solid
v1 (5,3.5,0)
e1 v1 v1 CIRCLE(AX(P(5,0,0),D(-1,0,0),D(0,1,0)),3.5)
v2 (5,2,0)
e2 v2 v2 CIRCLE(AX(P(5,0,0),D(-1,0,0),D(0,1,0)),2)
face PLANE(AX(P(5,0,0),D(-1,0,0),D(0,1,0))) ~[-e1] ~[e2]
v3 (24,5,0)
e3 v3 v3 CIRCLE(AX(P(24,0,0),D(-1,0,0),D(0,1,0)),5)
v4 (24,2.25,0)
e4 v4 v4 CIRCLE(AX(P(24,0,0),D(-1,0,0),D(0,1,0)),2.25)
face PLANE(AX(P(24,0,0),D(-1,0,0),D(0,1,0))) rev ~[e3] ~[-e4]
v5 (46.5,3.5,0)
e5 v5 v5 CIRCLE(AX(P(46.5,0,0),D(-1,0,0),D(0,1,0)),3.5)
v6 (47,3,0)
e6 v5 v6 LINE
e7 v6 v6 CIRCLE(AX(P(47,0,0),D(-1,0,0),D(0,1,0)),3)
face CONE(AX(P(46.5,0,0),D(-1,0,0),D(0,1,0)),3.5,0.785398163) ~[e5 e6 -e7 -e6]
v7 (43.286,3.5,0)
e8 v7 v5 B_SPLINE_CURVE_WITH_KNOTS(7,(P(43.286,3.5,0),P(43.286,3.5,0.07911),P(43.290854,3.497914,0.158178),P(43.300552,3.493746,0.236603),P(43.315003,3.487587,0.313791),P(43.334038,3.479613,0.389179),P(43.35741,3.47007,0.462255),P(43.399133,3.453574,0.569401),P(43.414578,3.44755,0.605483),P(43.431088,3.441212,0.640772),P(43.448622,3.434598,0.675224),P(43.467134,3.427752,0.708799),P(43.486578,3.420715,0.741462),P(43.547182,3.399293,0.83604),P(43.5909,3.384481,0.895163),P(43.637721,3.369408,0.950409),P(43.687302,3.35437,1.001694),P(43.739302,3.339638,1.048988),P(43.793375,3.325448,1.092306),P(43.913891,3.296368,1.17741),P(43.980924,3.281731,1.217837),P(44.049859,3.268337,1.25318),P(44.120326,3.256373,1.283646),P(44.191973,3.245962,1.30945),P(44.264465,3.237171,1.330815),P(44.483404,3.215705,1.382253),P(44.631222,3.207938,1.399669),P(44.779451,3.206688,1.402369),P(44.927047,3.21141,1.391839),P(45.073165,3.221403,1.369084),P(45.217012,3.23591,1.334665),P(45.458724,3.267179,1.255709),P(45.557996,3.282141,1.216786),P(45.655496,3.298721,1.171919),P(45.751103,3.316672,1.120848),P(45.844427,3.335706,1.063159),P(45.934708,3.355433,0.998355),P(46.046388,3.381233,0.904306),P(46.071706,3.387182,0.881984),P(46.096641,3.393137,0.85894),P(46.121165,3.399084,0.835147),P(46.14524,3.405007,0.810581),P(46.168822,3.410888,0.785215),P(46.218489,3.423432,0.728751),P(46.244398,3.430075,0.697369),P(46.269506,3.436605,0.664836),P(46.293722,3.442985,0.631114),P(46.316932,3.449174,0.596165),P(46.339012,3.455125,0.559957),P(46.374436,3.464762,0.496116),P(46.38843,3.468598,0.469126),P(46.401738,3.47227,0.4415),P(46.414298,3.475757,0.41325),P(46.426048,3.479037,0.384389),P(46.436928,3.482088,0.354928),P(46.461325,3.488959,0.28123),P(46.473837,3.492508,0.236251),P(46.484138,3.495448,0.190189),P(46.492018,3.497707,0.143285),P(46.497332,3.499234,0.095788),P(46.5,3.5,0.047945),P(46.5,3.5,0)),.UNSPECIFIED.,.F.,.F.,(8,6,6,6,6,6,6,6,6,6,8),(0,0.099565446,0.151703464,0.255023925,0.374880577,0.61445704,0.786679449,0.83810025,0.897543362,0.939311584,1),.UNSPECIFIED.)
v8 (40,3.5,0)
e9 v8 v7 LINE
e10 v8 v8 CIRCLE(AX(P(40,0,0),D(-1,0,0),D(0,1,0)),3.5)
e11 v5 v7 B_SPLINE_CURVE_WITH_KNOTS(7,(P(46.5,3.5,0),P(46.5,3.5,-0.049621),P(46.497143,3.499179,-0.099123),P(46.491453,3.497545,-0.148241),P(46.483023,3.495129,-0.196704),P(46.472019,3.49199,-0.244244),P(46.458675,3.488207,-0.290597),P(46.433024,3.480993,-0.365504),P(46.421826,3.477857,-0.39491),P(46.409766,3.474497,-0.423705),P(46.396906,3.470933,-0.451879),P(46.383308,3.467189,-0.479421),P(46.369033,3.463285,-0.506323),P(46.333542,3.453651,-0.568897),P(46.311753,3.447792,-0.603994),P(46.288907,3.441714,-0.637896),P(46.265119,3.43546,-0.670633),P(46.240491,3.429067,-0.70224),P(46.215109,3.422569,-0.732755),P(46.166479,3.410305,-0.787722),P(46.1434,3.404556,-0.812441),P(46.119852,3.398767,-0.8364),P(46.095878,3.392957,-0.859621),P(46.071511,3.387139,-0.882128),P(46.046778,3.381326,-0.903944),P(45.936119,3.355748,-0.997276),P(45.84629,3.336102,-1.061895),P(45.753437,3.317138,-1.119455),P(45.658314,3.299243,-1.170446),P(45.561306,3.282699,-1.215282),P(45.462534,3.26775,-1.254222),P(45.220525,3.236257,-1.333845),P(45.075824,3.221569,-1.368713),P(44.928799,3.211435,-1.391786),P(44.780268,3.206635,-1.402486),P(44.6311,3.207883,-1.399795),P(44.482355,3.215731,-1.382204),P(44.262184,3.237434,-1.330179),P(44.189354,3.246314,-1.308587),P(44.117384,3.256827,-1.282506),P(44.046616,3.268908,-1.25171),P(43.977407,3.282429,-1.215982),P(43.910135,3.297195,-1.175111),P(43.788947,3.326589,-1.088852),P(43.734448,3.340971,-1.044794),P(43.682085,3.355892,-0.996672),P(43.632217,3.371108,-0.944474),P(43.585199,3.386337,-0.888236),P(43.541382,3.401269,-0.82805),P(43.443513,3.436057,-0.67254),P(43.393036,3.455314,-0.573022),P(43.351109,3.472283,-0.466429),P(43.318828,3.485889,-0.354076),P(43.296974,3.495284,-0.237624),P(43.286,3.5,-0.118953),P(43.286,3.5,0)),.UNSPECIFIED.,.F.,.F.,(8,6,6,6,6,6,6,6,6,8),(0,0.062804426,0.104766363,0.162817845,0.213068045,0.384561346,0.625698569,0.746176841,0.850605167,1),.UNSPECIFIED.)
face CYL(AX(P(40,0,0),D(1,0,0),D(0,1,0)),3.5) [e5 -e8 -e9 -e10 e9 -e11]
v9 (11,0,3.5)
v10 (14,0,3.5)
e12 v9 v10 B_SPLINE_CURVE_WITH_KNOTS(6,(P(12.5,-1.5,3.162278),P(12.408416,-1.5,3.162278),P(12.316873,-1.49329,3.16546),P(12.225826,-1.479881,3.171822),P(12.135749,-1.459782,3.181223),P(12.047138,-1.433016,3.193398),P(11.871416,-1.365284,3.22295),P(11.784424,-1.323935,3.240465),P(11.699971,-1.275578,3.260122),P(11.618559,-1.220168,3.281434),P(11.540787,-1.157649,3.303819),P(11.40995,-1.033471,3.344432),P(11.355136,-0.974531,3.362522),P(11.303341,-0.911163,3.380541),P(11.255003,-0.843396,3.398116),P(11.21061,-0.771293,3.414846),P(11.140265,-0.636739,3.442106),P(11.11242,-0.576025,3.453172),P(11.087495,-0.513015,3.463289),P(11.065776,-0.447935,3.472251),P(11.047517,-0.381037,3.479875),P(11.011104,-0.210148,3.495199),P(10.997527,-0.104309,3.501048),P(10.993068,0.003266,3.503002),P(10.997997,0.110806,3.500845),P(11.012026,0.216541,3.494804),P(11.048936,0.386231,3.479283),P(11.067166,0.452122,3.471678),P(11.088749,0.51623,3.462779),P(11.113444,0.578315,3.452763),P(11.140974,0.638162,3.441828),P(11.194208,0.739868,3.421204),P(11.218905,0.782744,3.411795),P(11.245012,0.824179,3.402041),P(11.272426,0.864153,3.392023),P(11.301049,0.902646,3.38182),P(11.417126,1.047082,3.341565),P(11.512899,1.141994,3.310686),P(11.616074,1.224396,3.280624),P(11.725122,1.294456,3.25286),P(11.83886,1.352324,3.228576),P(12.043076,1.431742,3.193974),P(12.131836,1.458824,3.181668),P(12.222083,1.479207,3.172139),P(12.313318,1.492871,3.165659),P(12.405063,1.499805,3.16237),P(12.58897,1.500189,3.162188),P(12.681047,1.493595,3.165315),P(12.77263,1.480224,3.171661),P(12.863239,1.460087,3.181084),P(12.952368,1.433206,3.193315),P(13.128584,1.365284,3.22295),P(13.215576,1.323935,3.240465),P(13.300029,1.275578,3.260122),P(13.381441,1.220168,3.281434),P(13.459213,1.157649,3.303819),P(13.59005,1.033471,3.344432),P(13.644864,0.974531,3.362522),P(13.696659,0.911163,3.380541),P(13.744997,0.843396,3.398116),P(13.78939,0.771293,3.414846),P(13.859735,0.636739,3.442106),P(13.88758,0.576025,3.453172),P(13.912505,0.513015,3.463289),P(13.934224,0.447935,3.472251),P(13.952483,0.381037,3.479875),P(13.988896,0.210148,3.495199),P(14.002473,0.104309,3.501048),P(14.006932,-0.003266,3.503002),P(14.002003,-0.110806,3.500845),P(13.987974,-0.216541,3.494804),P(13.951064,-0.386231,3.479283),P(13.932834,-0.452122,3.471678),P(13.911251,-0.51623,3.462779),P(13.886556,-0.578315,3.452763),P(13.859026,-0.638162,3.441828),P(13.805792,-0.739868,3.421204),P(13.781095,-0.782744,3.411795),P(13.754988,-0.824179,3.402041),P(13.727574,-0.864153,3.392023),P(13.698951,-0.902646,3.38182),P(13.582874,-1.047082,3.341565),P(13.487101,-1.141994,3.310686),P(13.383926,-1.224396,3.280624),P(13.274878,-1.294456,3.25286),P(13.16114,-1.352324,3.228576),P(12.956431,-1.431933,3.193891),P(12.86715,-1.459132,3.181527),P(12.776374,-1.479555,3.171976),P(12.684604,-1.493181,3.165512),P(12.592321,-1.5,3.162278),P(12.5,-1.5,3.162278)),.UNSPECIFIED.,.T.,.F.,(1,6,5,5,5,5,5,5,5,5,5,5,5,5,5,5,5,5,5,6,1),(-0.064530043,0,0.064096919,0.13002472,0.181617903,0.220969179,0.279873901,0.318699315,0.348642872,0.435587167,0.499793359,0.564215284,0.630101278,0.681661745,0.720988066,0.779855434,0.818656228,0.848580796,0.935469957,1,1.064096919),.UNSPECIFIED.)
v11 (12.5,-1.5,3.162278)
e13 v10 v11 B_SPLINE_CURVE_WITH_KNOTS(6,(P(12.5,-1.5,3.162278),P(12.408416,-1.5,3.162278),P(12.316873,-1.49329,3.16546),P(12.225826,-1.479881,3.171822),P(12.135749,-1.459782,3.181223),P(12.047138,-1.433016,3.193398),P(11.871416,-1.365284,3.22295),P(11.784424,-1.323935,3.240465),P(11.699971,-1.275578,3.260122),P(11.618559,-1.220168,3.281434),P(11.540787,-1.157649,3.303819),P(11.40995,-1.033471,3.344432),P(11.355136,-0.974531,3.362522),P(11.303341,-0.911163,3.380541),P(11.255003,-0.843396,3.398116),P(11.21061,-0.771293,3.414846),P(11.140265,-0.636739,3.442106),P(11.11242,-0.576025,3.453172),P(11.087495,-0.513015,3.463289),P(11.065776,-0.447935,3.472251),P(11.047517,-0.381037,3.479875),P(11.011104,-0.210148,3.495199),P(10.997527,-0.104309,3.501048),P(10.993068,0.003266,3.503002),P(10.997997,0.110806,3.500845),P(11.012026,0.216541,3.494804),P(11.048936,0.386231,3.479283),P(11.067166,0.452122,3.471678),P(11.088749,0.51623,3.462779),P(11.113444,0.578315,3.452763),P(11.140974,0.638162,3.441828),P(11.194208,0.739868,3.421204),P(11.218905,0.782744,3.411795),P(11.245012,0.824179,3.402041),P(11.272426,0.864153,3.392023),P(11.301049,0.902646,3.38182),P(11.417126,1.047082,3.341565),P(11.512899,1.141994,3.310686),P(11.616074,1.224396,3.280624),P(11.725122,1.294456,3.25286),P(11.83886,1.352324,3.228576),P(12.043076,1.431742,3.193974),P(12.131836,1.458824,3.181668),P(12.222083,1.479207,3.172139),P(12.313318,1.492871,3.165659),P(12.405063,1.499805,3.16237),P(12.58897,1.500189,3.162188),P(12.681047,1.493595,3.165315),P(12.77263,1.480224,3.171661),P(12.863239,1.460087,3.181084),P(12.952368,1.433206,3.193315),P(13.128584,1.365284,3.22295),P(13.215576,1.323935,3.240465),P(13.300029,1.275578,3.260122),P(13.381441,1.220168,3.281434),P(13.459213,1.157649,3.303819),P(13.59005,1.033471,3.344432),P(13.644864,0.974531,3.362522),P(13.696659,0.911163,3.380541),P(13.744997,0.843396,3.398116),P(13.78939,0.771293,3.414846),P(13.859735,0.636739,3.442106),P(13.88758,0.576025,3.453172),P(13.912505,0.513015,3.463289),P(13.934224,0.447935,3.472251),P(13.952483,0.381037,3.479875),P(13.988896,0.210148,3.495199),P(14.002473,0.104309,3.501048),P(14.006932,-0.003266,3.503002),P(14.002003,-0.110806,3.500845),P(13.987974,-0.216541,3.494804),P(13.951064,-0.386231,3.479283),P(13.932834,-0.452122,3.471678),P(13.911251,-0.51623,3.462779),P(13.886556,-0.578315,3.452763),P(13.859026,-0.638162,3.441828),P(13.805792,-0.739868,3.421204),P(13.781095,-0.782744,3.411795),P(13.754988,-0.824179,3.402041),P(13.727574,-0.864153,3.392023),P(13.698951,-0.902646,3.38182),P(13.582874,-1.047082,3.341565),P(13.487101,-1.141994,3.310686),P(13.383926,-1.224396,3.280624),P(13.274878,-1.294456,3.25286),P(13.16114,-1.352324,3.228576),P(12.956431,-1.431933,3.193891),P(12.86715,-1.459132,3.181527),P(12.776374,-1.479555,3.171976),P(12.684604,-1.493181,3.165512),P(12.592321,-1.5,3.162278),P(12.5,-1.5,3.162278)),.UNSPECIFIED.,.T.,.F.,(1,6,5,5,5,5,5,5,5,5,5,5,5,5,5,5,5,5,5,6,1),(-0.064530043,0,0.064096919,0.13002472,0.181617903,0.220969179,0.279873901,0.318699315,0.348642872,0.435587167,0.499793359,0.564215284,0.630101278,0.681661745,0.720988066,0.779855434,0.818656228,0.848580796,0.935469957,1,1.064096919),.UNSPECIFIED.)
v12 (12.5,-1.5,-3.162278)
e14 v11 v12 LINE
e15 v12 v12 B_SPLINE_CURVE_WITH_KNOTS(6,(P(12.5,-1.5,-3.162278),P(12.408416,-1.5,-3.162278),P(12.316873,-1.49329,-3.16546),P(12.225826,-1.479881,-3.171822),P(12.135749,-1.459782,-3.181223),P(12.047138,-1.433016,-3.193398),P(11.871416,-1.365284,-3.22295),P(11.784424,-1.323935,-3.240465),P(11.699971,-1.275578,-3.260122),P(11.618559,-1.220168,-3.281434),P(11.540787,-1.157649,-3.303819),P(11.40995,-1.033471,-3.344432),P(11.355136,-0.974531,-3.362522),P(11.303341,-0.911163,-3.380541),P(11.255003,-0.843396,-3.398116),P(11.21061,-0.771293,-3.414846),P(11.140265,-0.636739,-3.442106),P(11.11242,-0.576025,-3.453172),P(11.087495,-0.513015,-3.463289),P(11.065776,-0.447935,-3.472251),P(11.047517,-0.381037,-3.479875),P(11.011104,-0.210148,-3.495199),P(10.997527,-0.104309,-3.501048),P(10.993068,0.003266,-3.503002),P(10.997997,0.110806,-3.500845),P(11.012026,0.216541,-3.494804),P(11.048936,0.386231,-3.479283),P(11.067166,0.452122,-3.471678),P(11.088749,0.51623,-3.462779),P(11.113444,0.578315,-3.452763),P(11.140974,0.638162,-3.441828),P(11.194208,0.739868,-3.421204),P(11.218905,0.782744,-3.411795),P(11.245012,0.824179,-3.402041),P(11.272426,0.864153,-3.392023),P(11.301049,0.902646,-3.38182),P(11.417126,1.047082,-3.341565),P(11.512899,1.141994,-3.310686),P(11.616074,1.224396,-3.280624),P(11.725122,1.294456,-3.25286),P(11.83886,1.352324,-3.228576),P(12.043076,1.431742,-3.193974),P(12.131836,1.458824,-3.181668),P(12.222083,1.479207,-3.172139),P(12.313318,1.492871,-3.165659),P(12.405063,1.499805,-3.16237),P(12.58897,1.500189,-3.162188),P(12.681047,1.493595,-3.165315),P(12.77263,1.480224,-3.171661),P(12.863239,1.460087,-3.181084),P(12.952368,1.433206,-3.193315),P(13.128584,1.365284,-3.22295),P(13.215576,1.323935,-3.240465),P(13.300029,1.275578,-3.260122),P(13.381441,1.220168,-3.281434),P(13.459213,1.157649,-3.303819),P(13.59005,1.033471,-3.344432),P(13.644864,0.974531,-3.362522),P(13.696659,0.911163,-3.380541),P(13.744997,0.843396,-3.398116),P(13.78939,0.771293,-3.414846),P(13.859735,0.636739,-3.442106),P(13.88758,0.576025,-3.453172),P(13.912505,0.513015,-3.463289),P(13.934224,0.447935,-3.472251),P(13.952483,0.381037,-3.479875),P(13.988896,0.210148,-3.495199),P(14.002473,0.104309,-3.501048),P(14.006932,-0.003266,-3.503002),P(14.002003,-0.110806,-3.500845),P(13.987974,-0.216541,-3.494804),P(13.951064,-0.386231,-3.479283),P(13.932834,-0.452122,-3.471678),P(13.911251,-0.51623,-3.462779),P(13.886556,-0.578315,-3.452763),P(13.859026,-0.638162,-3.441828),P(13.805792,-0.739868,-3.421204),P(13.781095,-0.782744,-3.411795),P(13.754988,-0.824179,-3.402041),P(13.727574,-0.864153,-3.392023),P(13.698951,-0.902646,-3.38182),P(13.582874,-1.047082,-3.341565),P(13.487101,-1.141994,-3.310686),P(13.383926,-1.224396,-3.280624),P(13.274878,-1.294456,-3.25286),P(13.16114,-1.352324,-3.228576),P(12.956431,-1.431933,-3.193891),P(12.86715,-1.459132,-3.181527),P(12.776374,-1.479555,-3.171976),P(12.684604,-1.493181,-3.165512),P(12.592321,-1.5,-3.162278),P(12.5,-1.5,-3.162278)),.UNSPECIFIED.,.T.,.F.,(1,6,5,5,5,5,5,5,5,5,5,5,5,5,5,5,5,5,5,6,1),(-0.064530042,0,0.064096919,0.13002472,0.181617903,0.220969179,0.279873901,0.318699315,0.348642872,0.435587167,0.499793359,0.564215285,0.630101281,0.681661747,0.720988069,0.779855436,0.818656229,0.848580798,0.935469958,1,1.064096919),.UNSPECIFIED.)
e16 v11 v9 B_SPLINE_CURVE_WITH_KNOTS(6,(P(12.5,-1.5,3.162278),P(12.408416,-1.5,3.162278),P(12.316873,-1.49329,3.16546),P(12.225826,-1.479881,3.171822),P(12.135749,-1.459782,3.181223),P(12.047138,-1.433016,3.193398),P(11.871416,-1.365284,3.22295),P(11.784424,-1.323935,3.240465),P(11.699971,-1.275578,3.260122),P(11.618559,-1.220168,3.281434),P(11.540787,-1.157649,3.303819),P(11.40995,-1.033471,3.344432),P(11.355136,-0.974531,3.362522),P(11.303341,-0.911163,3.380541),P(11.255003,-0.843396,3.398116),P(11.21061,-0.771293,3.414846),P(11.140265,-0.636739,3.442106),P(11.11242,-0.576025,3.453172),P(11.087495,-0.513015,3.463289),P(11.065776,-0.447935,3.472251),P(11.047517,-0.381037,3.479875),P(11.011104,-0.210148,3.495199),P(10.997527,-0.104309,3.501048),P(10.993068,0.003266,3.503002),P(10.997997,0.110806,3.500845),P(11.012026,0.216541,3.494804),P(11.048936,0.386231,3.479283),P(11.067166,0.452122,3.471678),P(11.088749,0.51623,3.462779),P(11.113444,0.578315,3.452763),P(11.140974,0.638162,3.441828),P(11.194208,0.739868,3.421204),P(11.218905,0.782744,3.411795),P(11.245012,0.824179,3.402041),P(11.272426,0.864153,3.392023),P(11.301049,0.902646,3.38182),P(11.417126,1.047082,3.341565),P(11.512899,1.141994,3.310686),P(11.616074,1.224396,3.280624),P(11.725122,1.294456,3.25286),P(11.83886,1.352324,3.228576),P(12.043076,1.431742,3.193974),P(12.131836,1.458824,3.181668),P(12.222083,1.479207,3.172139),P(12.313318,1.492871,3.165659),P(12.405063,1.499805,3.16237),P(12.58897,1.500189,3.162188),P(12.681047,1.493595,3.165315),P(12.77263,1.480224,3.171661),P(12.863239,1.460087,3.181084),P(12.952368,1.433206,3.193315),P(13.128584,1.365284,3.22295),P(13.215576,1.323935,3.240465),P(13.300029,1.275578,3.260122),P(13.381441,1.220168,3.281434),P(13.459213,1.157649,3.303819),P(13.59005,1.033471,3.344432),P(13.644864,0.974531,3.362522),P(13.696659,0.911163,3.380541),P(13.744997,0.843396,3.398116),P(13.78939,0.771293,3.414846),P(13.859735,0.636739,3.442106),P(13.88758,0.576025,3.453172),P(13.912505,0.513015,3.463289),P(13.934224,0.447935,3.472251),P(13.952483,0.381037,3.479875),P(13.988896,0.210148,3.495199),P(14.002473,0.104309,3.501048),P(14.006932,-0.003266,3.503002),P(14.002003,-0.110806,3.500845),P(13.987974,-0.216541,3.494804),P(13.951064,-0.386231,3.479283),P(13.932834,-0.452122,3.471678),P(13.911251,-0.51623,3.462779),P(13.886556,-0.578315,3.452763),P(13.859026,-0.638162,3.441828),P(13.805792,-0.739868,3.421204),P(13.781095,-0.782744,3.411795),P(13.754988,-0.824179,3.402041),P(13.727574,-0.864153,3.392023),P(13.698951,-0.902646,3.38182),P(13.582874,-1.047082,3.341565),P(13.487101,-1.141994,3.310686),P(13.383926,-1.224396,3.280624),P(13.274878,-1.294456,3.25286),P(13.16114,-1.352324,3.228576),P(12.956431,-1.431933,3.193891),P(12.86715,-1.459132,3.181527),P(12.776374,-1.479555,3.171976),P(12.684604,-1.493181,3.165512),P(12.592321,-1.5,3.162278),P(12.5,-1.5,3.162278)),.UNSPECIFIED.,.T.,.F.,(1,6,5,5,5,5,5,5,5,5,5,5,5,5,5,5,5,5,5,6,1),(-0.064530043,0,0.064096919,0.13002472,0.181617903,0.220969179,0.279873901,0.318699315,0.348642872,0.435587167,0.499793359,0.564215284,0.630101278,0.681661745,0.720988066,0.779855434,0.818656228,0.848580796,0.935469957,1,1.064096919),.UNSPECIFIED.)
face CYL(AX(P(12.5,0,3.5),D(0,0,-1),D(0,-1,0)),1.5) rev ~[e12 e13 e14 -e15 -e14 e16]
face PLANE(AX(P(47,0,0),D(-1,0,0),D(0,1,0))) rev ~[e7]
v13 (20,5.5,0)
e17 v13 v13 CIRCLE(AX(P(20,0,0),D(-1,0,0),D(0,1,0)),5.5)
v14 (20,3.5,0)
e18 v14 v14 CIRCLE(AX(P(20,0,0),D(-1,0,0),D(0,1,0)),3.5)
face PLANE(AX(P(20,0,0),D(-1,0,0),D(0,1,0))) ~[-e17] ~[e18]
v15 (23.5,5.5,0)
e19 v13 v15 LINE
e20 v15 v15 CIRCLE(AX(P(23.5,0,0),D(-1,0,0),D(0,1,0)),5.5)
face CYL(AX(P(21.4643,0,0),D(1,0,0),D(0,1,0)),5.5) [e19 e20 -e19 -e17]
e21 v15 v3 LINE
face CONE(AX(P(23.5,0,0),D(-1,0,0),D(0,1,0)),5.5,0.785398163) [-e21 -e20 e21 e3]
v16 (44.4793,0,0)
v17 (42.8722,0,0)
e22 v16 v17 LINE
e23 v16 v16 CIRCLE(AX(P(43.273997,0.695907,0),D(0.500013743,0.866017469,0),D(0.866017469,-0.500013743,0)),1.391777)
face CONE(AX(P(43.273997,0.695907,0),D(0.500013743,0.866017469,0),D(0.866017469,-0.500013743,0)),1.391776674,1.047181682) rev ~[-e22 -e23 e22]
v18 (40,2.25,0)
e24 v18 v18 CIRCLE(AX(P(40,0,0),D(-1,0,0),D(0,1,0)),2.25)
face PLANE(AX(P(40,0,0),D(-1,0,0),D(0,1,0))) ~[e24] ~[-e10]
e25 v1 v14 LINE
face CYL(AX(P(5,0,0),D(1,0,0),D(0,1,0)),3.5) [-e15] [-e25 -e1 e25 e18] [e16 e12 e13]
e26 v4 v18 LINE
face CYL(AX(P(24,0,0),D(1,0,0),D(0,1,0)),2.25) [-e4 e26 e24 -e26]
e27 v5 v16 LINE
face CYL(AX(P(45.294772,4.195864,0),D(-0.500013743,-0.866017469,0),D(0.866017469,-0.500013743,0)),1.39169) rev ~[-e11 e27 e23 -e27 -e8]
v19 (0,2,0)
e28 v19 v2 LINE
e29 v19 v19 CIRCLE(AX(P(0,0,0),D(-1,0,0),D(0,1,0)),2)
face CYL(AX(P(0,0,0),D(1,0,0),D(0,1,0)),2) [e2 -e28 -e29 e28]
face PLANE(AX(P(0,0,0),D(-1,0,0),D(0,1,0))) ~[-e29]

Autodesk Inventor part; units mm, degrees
ref_plane "YZ Plane" through (0, 0, 0) normal (1, 0, 0) x (0, 1, 0)
ref_plane "XZ Plane" through (0, 0, 0) normal (0, 1, 0) x (-1, 0, 0)
sketch "Sketch1" plane through (0, 0, 0) normal (0, 0, 1) x (1, 0, 0)
  line L0 (0, 0) -> (0, 2)
  line L1 (0, 2) -> (5, 2)
  line L2 (5, 2) -> (5, 3.5)
  line L3 (5, 3.5) -> (20, 3.5)
  line L4 (20, 3.5) -> (20, 5.5)
  line L5 (20, 5.5) -> (21.4643, 5.5)
  line L6 (21.4643, 5.5) -> (21.4643, 5.5)
  line L7 (21.4643, 5.5) -> (24, 5.5)
  line L8 (24, 5.5) -> (24, 2.25)
  line L9 (24, 2.25) -> (40, 2.25)
  line L10 (40, 2.25) -> (40, 3.5)
  line L11 (40, 3.5) -> (47, 3.5)
  line L12 (47, 3.5) -> (47, 0)
  line L13 (47, 0) -> (0, 0)
  dimension "d0" = 4
  dimension "d1" = 7
  dimension "d2" = 5
  dimension "d3" = 15
  dimension "d4" = 47
  dimension "d5" = 7
  dimension "d6" = 16
  dimension "d7" = 4.5
  dimension "d8" = 4
  dimension "d10" = 11
revolve "Revolution1" add sketch "Sketch1" angle 360 about axis through (47, 0, 0) along (-1, 0, 0)
thread "Thread1" size "M4x0.7" class "6g" standard "ISO Metric profile" length 10
chamfer "Chamfer1" distance 0.5 angle 45 2 edges at (24, -5.5, 0) (47, -3.5, 0)
ref_plane "Work Plane1" through (0, 0, 3.5) normal (0, 0, 1) x (1, 0, 0)
sketch "Sketch2" plane through (0, 0, 3.5) normal (0, 0, 1) x (1, 0, 0)
  line L0 (5, 3.5) -> (5, -3.5) projected
  point P0 (0, 0)
  point P1 (12.5, 0)
  dimension "d18" = 7.5
hole "Hole1" at (12.5, 0, 3.5) direction (0, 0, -1) diameter 3 end through all
sketch "Sketch4" plane through (0, 0, 0) normal (0, 0, 1) x (1, 0, 0)
  line L0 (44.893, 3.5) -> (42.8722, 0)
  line L1 (46.5, 3.5) -> (44.893, 3.5)
  line L2 (47, 3) -> (47, -3) projected
  line L3 (46.5, 3.5) -> (40, 3.5) projected
  line L4 (46.5, -3.5) -> (46.5, 3.5) projected
  line L5 (46.5, 3.5) -> (44.4793, 0)
  line L6 (44.4793, 0) -> (42.8722, 0)
  point P0 (0, 0)
  point P1 (44.4443, 0)
  point P2 (47, 0)
  point P3 (46.5, 0)
  dimension "d38" = 30
revolve "Revolution3" cut sketch "Sketch4" angle 360 about axis through (44.893, 3.5, 0) along (0.5, 0.8660254, 0)
properties part number "151"
